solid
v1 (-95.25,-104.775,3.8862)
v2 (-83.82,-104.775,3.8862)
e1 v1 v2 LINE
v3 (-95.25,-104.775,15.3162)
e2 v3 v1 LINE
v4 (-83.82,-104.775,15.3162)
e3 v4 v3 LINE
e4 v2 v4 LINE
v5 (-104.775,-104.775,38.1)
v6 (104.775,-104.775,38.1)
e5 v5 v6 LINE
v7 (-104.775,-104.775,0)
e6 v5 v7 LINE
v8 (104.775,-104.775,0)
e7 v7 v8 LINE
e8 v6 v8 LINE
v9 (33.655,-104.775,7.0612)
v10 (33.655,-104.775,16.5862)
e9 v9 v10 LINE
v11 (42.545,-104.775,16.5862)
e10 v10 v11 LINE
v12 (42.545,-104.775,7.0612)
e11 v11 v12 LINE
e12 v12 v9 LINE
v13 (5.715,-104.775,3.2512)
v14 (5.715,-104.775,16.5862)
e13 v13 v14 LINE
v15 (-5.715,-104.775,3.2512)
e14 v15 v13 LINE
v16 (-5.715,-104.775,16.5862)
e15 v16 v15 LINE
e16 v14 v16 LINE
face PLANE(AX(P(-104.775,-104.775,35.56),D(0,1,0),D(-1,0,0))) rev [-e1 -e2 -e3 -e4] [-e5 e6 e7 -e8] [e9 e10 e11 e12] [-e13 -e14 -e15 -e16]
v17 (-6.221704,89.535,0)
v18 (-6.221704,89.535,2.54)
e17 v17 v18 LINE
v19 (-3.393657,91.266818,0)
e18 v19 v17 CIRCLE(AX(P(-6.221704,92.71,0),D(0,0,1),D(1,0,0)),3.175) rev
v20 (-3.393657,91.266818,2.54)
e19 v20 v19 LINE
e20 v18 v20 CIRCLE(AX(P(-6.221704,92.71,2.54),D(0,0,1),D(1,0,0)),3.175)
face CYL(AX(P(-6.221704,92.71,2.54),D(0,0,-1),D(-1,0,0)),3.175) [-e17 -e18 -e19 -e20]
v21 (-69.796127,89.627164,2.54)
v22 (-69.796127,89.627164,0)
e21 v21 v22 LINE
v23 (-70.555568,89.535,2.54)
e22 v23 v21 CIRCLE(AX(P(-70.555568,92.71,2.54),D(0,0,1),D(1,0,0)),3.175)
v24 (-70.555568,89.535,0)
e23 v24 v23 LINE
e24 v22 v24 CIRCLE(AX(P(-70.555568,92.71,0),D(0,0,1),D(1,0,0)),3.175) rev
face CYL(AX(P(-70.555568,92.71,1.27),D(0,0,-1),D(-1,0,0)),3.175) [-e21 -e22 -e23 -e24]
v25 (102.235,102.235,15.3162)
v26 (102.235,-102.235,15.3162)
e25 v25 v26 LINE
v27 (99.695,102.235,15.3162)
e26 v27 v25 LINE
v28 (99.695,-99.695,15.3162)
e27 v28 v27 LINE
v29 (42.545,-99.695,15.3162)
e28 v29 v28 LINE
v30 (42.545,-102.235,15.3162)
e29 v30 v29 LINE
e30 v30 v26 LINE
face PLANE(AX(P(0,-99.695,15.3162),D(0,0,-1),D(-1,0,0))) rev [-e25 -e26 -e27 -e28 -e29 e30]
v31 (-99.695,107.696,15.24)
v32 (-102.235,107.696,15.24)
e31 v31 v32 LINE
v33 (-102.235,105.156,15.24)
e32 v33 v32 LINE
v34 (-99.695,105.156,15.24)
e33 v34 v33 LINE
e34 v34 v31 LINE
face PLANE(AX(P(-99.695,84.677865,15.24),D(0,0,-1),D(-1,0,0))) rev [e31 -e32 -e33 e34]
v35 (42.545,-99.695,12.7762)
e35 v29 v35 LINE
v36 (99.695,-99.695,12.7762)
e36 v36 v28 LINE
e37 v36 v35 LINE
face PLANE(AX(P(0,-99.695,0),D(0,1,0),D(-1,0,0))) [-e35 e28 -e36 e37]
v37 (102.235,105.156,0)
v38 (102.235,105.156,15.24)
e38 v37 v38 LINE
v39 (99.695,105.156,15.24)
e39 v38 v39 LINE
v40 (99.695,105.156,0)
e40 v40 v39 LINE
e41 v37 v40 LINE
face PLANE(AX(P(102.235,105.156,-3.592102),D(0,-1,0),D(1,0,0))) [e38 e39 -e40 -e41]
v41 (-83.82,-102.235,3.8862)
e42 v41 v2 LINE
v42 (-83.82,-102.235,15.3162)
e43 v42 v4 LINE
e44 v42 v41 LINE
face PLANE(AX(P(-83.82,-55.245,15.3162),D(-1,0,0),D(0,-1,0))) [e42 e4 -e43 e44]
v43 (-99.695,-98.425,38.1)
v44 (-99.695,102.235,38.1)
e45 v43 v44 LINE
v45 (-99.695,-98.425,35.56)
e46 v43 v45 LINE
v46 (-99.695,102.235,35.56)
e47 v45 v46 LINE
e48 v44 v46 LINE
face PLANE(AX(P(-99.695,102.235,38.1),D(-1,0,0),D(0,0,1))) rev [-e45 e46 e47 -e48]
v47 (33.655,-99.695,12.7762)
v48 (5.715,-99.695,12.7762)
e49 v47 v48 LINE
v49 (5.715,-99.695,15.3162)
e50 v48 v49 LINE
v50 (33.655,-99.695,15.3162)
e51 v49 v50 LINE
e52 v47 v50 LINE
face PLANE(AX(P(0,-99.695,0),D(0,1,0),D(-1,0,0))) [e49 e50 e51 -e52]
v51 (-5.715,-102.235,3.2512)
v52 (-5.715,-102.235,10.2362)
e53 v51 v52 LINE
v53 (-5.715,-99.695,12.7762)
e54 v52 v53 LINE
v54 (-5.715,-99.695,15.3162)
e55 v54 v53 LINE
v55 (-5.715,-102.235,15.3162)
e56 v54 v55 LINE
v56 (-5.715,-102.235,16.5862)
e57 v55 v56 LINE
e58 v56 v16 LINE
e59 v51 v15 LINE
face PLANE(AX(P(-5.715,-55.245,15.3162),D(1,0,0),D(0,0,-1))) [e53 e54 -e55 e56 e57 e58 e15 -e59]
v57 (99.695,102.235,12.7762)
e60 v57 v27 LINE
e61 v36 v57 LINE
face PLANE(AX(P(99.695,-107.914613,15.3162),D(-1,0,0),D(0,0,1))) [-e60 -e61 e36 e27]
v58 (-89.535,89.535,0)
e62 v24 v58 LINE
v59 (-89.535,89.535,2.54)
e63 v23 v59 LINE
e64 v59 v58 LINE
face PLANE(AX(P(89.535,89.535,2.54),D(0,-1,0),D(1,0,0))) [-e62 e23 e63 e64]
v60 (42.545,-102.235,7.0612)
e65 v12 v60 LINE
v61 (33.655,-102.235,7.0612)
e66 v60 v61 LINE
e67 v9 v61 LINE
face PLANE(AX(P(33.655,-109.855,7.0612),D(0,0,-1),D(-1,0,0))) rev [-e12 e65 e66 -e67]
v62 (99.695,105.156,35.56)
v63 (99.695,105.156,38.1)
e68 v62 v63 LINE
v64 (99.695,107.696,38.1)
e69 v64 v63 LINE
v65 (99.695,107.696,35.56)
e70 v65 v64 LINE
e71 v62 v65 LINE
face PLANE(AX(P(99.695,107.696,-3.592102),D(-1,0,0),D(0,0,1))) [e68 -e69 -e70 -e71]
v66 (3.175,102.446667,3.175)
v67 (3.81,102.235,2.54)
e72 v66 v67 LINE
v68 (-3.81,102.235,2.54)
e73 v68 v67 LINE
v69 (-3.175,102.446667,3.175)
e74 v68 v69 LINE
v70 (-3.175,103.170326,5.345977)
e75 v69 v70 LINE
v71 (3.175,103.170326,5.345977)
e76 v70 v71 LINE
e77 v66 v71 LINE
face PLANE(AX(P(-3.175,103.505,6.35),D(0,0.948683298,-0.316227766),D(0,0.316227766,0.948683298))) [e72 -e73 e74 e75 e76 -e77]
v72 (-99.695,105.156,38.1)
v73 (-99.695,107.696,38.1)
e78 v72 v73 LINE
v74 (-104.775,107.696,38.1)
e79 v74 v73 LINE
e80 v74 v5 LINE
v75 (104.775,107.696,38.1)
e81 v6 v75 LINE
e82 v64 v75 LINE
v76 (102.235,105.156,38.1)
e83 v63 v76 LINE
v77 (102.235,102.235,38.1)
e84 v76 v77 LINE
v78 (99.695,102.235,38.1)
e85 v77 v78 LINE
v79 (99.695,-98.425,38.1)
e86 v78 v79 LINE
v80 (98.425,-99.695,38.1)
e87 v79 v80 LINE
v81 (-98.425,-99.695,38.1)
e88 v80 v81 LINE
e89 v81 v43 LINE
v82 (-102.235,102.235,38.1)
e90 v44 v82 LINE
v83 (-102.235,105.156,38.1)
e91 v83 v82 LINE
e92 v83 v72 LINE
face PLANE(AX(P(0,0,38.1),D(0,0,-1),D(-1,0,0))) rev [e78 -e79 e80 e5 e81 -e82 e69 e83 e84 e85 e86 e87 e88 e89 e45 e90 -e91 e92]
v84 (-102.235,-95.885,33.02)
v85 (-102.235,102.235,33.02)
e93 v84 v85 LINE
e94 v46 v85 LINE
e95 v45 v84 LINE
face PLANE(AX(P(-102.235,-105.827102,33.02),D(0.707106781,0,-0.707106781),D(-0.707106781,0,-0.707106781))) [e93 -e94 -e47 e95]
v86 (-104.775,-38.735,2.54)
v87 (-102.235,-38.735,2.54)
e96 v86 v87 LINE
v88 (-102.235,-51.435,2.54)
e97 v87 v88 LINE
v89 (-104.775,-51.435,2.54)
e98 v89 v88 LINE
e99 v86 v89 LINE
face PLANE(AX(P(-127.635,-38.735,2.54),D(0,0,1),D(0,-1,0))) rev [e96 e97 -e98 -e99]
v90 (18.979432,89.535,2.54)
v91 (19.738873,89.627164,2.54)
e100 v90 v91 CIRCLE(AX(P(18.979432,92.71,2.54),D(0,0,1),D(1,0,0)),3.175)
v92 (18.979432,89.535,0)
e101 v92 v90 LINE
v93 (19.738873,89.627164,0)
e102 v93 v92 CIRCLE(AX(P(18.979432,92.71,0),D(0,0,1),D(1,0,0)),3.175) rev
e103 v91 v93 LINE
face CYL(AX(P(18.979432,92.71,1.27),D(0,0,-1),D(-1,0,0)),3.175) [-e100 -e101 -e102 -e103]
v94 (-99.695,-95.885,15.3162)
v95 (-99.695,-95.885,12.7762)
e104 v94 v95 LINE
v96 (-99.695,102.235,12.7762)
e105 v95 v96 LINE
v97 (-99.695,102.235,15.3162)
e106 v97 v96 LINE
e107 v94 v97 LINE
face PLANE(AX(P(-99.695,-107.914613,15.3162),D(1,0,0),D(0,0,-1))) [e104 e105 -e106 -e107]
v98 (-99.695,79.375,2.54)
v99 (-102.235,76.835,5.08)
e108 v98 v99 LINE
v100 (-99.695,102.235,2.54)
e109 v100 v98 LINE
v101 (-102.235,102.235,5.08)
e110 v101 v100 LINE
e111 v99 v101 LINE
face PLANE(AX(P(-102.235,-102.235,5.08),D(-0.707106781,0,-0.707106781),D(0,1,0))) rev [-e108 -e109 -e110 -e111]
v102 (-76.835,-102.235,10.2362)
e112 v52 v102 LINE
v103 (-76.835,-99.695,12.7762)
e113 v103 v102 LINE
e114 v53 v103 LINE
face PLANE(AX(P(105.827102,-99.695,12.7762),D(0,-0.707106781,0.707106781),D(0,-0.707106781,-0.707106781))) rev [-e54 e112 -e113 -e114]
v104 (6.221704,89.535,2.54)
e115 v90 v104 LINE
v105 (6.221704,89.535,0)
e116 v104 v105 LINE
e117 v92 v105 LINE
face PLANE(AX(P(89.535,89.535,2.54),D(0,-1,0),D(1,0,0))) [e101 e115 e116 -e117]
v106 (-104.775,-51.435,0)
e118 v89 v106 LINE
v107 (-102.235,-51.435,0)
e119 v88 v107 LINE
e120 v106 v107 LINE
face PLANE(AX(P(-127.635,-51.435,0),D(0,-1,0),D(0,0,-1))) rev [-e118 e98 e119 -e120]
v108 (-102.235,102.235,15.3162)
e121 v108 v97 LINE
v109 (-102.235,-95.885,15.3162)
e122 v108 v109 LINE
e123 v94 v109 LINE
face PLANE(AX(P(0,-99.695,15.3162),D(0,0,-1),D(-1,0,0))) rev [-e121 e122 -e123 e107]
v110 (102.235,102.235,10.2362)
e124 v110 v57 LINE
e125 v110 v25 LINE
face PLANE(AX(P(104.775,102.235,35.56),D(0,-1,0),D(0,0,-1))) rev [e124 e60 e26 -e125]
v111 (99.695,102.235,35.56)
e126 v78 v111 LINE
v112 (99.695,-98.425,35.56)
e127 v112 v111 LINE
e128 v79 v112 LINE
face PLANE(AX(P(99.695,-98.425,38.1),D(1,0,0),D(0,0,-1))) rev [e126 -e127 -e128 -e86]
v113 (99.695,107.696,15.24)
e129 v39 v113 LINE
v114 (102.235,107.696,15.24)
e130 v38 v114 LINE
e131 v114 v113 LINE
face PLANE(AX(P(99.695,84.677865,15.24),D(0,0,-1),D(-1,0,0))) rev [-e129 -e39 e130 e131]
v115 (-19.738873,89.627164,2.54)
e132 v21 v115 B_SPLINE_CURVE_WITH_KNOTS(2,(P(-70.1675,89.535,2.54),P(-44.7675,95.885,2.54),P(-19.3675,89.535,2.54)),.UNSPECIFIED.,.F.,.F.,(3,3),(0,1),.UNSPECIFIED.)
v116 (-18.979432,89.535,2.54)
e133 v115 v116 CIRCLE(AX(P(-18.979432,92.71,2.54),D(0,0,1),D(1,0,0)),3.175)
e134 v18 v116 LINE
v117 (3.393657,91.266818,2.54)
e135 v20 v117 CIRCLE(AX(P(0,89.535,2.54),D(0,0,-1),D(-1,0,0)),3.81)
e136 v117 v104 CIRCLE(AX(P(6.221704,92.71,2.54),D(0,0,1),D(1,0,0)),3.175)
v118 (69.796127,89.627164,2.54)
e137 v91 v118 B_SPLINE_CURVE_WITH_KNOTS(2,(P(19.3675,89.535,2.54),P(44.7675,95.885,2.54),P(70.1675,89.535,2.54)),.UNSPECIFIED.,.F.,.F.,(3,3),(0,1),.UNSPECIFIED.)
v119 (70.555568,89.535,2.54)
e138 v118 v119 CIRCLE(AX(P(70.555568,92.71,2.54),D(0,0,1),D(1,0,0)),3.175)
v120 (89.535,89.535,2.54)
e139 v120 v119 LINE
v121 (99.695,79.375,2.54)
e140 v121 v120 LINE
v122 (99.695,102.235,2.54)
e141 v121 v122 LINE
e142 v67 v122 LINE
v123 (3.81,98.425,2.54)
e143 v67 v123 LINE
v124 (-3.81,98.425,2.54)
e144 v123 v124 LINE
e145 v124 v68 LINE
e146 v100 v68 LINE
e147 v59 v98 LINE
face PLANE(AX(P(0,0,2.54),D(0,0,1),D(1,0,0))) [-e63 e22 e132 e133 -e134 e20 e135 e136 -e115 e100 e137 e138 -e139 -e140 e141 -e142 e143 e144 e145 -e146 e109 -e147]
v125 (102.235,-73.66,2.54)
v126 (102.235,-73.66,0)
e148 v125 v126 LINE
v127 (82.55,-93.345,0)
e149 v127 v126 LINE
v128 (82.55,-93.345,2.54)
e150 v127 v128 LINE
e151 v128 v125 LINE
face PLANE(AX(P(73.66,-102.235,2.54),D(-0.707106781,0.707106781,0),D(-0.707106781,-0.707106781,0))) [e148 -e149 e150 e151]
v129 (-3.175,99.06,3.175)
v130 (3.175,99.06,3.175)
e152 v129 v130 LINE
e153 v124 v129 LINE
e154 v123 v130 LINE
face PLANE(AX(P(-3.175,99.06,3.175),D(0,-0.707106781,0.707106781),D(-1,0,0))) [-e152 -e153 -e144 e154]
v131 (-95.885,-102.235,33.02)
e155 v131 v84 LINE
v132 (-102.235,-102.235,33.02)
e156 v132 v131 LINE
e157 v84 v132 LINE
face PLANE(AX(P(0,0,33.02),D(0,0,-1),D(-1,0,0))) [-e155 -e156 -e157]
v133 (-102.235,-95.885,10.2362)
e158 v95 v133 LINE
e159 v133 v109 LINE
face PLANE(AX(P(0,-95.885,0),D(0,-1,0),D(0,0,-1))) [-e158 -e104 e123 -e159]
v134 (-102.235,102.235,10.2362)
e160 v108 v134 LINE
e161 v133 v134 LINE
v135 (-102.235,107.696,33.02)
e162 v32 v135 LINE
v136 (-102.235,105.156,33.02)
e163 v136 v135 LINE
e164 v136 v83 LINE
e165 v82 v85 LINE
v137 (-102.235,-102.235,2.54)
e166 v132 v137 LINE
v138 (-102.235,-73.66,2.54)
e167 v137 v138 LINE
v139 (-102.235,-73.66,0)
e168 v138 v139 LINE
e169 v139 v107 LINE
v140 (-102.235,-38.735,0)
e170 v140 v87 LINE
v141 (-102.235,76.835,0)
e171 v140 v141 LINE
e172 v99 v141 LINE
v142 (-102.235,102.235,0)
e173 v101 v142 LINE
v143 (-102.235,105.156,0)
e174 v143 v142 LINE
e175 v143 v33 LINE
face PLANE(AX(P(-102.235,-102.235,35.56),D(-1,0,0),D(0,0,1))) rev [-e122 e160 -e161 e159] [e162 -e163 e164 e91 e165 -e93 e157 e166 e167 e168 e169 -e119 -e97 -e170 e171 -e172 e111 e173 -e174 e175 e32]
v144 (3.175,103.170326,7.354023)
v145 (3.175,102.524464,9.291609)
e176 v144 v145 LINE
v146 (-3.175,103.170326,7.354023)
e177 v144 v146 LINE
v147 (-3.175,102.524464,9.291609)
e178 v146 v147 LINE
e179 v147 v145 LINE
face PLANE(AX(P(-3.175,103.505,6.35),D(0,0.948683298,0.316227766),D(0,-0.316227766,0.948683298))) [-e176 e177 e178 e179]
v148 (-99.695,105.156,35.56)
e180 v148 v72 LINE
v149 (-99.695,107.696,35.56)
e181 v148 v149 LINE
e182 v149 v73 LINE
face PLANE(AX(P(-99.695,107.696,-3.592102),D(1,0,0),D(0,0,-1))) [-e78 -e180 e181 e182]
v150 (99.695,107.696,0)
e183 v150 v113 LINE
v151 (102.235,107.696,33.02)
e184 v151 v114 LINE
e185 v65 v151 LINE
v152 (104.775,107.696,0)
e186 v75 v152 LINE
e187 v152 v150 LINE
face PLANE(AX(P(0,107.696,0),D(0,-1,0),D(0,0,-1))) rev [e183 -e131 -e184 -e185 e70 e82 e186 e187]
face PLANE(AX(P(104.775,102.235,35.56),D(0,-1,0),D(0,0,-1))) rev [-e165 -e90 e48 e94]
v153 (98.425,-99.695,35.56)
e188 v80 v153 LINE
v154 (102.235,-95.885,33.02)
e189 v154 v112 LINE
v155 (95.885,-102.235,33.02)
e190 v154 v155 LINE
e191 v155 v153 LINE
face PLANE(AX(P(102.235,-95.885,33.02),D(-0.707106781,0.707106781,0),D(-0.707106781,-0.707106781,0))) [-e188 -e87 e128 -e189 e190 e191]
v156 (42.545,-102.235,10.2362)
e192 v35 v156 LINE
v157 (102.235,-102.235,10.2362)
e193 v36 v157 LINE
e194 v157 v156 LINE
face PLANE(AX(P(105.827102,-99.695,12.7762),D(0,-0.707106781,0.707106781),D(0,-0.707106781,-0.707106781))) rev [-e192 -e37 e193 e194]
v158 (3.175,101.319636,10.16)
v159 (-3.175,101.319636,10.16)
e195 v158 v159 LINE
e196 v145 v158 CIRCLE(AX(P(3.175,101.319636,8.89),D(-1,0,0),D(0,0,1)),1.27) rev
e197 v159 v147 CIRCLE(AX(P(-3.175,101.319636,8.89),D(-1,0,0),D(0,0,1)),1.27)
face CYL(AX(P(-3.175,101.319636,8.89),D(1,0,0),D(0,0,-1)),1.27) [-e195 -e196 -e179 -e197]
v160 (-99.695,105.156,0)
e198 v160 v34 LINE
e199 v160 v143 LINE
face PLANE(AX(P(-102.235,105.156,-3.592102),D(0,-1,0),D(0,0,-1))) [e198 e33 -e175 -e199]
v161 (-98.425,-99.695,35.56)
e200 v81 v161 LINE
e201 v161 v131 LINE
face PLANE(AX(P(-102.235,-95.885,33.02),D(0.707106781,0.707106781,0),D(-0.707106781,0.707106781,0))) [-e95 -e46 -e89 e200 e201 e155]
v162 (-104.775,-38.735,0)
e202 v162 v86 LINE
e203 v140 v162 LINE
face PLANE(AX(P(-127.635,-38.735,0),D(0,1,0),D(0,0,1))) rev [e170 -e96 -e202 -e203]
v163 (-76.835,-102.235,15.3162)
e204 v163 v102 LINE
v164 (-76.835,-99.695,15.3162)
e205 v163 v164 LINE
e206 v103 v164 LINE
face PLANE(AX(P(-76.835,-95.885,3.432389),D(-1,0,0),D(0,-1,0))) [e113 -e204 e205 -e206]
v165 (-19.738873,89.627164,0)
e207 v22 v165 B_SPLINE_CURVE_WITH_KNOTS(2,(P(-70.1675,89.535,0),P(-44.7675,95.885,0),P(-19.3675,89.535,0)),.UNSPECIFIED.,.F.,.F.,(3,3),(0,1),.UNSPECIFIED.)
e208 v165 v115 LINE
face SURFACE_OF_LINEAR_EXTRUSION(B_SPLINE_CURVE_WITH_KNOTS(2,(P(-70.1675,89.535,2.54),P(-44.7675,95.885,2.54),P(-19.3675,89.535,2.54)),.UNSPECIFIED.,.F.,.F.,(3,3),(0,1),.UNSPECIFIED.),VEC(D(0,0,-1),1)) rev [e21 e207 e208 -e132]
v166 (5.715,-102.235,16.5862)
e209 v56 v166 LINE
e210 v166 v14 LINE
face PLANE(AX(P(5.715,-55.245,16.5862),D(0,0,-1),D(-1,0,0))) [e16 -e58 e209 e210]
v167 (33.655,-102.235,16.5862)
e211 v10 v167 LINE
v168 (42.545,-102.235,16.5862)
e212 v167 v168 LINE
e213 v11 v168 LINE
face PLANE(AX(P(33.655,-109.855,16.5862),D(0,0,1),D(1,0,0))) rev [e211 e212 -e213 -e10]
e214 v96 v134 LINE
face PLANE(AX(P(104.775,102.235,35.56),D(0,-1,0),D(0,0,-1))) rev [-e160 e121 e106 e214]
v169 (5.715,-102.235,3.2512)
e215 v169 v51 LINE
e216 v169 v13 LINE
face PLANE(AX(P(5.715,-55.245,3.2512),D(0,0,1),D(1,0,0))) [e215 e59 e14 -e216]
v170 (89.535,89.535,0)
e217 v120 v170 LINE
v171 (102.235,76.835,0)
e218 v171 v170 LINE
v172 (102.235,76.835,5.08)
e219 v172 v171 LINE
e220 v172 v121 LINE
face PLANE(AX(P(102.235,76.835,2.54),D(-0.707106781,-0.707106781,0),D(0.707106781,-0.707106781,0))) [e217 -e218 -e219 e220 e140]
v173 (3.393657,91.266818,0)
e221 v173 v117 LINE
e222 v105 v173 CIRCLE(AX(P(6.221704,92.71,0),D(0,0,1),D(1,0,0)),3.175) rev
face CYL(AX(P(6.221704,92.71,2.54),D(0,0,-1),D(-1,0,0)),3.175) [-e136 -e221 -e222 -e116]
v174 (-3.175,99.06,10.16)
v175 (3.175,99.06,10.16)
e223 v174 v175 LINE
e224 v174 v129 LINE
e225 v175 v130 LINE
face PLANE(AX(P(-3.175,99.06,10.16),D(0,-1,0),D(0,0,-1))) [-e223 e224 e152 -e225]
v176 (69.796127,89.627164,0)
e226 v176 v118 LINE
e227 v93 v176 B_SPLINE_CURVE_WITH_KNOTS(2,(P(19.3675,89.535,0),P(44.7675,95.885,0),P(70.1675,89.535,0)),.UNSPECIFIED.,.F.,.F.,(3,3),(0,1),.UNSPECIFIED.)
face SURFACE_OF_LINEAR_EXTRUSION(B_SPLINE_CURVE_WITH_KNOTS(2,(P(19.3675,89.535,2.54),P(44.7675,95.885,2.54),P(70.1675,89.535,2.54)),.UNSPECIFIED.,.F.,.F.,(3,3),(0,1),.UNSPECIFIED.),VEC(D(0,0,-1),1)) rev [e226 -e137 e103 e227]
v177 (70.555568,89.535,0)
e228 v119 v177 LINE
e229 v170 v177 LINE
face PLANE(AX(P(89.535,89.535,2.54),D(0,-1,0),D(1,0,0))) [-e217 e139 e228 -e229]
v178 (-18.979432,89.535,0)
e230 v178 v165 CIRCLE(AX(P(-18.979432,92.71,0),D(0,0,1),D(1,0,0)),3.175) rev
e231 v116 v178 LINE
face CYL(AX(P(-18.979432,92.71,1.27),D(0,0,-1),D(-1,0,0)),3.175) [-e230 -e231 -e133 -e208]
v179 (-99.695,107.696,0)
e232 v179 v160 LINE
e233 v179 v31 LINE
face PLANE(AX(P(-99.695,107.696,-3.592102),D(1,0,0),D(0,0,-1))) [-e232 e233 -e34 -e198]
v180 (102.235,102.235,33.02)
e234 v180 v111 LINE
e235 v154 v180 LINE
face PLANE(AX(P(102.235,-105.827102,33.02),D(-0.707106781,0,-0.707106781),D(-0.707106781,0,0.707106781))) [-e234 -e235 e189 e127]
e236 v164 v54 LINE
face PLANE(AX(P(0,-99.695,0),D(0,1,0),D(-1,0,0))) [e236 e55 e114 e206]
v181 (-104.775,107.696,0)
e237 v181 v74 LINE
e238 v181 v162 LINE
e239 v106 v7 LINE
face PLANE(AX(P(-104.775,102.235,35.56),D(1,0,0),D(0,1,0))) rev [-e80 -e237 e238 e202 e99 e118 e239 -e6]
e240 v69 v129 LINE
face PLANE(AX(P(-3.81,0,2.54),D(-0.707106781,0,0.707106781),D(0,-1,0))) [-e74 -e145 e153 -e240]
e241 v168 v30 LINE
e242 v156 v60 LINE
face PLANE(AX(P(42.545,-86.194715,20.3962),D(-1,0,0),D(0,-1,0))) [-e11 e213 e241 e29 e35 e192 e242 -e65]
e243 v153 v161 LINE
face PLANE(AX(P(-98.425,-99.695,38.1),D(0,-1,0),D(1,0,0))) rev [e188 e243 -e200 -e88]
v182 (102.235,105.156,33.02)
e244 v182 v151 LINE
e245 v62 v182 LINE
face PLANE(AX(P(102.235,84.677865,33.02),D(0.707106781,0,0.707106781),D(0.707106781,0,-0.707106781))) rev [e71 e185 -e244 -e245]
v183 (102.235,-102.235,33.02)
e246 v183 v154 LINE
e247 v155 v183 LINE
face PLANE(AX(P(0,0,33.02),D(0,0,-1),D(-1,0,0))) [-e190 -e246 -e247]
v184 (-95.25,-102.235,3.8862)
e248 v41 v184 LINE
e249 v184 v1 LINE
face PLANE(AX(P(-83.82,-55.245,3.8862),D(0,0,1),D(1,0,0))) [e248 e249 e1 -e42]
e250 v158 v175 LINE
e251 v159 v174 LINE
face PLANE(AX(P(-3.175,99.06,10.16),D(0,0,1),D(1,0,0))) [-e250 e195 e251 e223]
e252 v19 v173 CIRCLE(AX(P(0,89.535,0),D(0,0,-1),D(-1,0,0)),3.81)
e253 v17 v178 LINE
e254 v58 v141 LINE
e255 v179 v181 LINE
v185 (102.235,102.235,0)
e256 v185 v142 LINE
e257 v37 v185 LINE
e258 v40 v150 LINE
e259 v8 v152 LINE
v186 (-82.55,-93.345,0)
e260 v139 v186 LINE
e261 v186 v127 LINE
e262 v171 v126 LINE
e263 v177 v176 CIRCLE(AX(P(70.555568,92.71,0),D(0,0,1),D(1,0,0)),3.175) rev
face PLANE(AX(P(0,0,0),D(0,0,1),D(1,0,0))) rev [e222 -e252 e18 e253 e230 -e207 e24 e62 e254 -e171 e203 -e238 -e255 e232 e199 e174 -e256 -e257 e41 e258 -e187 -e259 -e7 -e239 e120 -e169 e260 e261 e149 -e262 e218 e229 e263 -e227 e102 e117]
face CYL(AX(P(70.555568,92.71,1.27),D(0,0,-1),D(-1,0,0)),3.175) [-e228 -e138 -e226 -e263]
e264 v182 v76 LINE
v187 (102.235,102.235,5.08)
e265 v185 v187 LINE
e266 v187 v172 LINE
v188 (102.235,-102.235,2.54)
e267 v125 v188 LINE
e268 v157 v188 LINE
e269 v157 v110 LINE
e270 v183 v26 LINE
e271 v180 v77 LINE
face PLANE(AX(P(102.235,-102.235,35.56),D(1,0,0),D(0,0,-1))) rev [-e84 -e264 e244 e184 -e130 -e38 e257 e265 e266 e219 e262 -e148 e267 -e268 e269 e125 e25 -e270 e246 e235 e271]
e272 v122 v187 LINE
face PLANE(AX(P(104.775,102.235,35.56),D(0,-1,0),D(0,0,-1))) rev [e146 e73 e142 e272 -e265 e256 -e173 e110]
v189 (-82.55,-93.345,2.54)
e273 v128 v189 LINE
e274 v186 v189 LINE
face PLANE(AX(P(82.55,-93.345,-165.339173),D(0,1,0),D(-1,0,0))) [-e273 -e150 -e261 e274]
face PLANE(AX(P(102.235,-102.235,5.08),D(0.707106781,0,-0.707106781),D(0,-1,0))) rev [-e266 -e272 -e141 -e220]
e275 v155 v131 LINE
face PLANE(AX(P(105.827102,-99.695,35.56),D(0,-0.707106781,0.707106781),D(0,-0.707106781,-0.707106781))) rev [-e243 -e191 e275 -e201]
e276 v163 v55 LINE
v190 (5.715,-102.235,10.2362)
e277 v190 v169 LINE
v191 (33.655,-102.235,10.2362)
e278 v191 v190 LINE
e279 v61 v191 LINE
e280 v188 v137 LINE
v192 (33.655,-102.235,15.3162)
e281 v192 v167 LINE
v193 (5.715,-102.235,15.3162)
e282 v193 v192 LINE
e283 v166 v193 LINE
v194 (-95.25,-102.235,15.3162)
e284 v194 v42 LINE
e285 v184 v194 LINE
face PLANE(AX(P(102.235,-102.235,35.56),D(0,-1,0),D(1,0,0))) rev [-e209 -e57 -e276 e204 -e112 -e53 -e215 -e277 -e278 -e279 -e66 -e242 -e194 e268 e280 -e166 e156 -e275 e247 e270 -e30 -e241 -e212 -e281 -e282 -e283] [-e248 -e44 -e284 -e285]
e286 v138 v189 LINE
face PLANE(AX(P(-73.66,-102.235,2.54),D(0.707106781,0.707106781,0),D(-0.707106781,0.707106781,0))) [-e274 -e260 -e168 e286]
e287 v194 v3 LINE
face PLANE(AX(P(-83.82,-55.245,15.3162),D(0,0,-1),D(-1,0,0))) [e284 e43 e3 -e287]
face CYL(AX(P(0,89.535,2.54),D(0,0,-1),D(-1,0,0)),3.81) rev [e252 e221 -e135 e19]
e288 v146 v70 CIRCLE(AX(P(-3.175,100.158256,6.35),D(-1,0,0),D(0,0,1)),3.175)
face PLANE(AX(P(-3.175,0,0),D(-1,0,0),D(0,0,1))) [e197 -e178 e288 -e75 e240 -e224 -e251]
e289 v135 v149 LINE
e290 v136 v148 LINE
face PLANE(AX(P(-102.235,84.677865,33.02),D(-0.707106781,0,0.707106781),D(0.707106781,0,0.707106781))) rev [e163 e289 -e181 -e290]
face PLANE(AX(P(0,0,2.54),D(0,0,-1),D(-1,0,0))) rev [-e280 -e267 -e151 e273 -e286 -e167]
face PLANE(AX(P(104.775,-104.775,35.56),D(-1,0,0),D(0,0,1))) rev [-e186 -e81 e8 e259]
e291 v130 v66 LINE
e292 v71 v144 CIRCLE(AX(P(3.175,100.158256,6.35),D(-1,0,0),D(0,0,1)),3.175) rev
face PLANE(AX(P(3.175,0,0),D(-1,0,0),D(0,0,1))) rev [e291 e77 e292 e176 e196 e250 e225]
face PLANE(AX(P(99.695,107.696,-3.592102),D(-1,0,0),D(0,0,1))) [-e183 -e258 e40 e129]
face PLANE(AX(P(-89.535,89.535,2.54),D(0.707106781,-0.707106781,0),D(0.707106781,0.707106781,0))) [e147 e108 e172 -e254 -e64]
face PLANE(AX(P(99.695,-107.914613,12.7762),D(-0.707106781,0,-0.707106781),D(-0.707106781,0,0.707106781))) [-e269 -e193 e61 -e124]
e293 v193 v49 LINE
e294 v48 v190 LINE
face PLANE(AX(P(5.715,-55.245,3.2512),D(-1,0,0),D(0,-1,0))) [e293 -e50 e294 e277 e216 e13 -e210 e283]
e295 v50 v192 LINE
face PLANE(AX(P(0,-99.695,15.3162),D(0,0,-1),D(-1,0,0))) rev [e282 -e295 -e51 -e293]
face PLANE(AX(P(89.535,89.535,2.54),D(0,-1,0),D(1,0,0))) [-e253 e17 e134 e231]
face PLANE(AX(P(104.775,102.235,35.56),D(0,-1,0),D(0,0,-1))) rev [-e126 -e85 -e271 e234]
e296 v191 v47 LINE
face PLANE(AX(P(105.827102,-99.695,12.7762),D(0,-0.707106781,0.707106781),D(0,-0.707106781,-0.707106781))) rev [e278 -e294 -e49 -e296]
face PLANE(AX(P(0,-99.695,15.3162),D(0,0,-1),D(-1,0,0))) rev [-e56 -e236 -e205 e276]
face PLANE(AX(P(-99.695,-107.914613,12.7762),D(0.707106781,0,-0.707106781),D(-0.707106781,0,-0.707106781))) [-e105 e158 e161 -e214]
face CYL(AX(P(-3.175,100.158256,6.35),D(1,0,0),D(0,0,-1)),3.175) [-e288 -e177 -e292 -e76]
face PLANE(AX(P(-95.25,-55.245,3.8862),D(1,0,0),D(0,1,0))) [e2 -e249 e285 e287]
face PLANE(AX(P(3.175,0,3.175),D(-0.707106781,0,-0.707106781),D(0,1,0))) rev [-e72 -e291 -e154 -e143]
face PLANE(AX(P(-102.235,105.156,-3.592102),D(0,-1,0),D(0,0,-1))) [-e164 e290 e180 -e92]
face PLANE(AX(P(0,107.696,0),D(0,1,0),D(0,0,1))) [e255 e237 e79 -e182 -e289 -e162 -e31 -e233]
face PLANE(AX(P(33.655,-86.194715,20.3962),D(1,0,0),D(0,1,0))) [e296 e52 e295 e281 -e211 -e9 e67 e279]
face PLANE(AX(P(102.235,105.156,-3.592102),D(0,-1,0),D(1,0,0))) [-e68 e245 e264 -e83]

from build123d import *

# Parameters (mm, degrees)
BOSS_EXTRUDE1_DEPTH       = 35.56
BOSS_EXTRUDE2_DEPTH       = 2.54
BOSS_EXTRUDE3_REACH       = 236.724
BOSS_EXTRUDE4_REACH       = 236.724
BOSS_EXTRUDE5_DEPTH       = 2.54
BOSS_EXTRUDE6_DEPTH       = 204.47
BOSS_EXTRUDE7_REACH       = 236.724
BOSS_EXTRUDE8_DEPTH       = 2.54
BOSS_EXTRUDE9_DEPTH       = 2.54
SKETCH11_R                = 3.81
CUT_EXTRUDE1_DEPTH        = 2.54
FILLET1_R                 = 3.175
CHAMFER1_SIZE             = 2.54
SKETCH12_W                = 2.54
SKETCH12_H                = 38.1
BOSS_EXTRUDE10_DEPTH      = 5.461
SKETCH13_W                = 2.54
SKETCH13_H                = 2.54
BOSS_EXTRUDE11_DEPTH      = 38.1
BOSS_EXTRUDE12_DEPTH      = 3.175
BOSS_EXTRUDE12_DEPTH_BACK = 3.175
FILLET2_R                 = 3.175
CHAMFER2_SIZE             = 0.635
FILLET3_R                 = 1.27
CUT_EXTRUDE2_DEPTH        = 46.99
CUT_EXTRUDE2_DEPTH_BACK   = 3.175
SKETCH15_W                = 11.43
SKETCH15_H                = 11.43
SKETCH16_W                = 11.43
SKETCH16_H                = 37.106454998
SKETCH16_W_2              = 25.4
SKETCH16_H_2              = 12.337621438
CUT_EXTRUDE3_DEPTH        = 6.35
CUT_EXTRUDE4_DEPTH        = 2.54
SKETCH18_W                = 2.54
SKETCH18_H                = 12.7
CUT_EXTRUDE5_DEPTH        = 25.4
BOSS_EXTRUDE13_DEPTH      = 2.54
SKETCH20_W                = 8.89
SKETCH20_H                = 10.16
CUT_EXTRUDE6_DEPTH        = 2.54
SKETCH21_W                = 8.89
SKETCH21_H                = 9.525
CUT_EXTRUDE7_DEPTH        = 7.62


with BuildPart() as part:
    # Sketch1 → Boss-Extrude1 (new body)
    with BuildSketch(Plane.XY):
        Polygon((-102.235, 102.235), (-104.775, 102.235), (-104.775, -104.775), (104.775, -104.775), (104.775, 102.235), (102.235, 102.235), (102.235, -102.235), (-102.235, -102.235), align=None)
    extrude(amount=BOSS_EXTRUDE1_DEPTH)

    # Sketch2 → Boss-Extrude2 (add)
    with BuildSketch(Plane.XY.offset(35.56)):
        Polygon((-102.235, -102.235), (-102.235, -95.885), (-95.885, -102.235), align=None)
        Polygon((102.235, -102.235), (102.235, -95.885), (95.885, -102.235), align=None)
    extrude(amount=-BOSS_EXTRUDE2_DEPTH)

    # Boss-Extrude3: up to this face of the body (flat: up to its plane)
    boss_extrude3_end = Plane(part.part.faces().sort_by_distance((0, -102.235, 17.706426025))[0])
    # Sketch4 → Boss-Extrude3 (add, up to the picked face)
    with BuildSketch(Plane(origin=(0, 102.235, 0), x_dir=(1, 0, 0), z_dir=(0, 1, 0)), mode=Mode.PRIVATE) as boss_extrude3_sk1:
        Polygon((-102.235, -33.02), (-99.695, -35.56), (-102.235, -35.56), align=None)
    boss_extrude3_tool1 = split(extrude(boss_extrude3_sk1.sketch, amount=-BOSS_EXTRUDE3_REACH, mode=Mode.PRIVATE), bisect_by=boss_extrude3_end, keep=Keep.BOTH, mode=Mode.PRIVATE)
    # Sketch4 → Boss-Extrude3 (add, up to the picked face)
    with BuildSketch(Plane(origin=(0, 102.235, 0), x_dir=(1, 0, 0), z_dir=(0, 1, 0)), mode=Mode.PRIVATE) as boss_extrude3_sk2:
        Polygon((102.235, -33.02), (99.695, -35.56), (102.235, -35.56), align=None)
    boss_extrude3_tool2 = split(extrude(boss_extrude3_sk2.sketch, amount=-BOSS_EXTRUDE3_REACH, mode=Mode.PRIVATE), bisect_by=boss_extrude3_end, keep=Keep.BOTH, mode=Mode.PRIVATE)
    add(boss_extrude3_tool1.solids().sort_by(Axis((-101.388333, 102.235, 34.713333), (0, -1, 0)))[0])
    add(boss_extrude3_tool2.solids().sort_by(Axis((101.388333, 102.235, 34.713333), (0, -1, 0)))[0])

    # Boss-Extrude4: up to this plane
    boss_extrude4_end = Plane(origin=(102.235, -95.885, 33.02), z_dir=(-0.7071067811865476, 0.7071067811865476, 0))
    # Sketch5 → Boss-Extrude4 (add, up to the surface)
    with BuildSketch(Plane(origin=(-102.235, 0, 0), x_dir=(0, 0, -1), z_dir=(1, 0, 0)), mode=Mode.PRIVATE) as boss_extrude4_sk1:
        Polygon((-33.02, -102.235), (-35.56, -102.235), (-35.56, -99.695), align=None)
    boss_extrude4_tool1 = split(extrude(boss_extrude4_sk1.sketch, amount=BOSS_EXTRUDE4_REACH, mode=Mode.PRIVATE), bisect_by=boss_extrude4_end, keep=Keep.BOTH, mode=Mode.PRIVATE)
    add(boss_extrude4_tool1.solids().sort_by_distance((-102.235, -101.388333, 34.713333))[0])

    # Sketch6 → Boss-Extrude5 (add)
    with BuildSketch(Plane(origin=(0, -102.235, 0), x_dir=(1, 0, 0), z_dir=(0, 1, 0))):
        Polygon((0, -15.3162), (-102.235, -15.3162), (-102.235, -12.7762), (102.235, -12.7762), (102.235, -15.3162), align=None)
    extrude(amount=BOSS_EXTRUDE5_DEPTH)

    # Sketch7 → Boss-Extrude6 (add)
    with BuildSketch(Plane(origin=(-102.235, 0, 0), x_dir=(0, 0, -1), z_dir=(1, 0, 0))):
        Polygon((-12.7762, -99.695), (-10.2362, -102.235), (-12.7762, -102.235), align=None)
    extrude(amount=BOSS_EXTRUDE6_DEPTH)

    # Boss-Extrude7: up to this face of the body (flat: up to its plane)
    boss_extrude7_end = Plane(part.part.faces().sort_by_distance((0, -102.235, 24.1681))[0])
    # Sketch8 → Boss-Extrude7 (add, up to the picked face)
    with BuildSketch(Plane(origin=(0, 102.235, 0), x_dir=(1, 0, 0), z_dir=(0, 1, 0)), mode=Mode.PRIVATE) as boss_extrude7_sk1:
        Polygon((-102.235, -15.3162), (-99.695, -15.3162), (-99.695, -12.7762), (-102.235, -10.2362), align=None)
    boss_extrude7_tool1 = split(extrude(boss_extrude7_sk1.sketch, amount=-BOSS_EXTRUDE7_REACH, mode=Mode.PRIVATE), bisect_by=boss_extrude7_end, keep=Keep.BOTH, mode=Mode.PRIVATE)
    # Sketch8 → Boss-Extrude7 (add, up to the picked face)
    with BuildSketch(Plane(origin=(0, 102.235, 0), x_dir=(1, 0, 0), z_dir=(0, 1, 0)), mode=Mode.PRIVATE) as boss_extrude7_sk2:
        Polygon((99.695, -15.3162), (99.695, -12.7762), (102.235, -10.2362), (102.235, -15.3162), align=None)
    boss_extrude7_tool2 = split(extrude(boss_extrude7_sk2.sketch, amount=-BOSS_EXTRUDE7_REACH, mode=Mode.PRIVATE), bisect_by=boss_extrude7_end, keep=Keep.BOTH, mode=Mode.PRIVATE)
    add(boss_extrude7_tool1.solids().sort_by(Axis((-101.106111, 102.235, 13.340644), (0, -1, 0)))[0])
    add(boss_extrude7_tool2.solids().sort_by(Axis((101.106111, 102.235, 13.340644), (0, -1, 0)))[0])

    # Sketch9 → Boss-Extrude8 (add)
    with BuildSketch(Plane.XY.offset(35.56)):
        Polygon((-104.775, 102.235), (-99.695, 102.235), (-99.695, -98.425), (-98.425, -99.695), (98.425, -99.695), (99.695, -98.425), (99.695, 102.235), (104.775, 102.235), (104.775, -104.775), (-104.775, -104.775), align=None)
    extrude(amount=BOSS_EXTRUDE8_DEPTH)

    # Sketch10 → Boss-Extrude9 (add)
    with BuildSketch(Plane(origin=(0, 0, 0), x_dir=(-1, 0, 0), z_dir=(0, 0, -1))):
        Polygon((-102.235, 102.235), (102.235, 102.235), (102.235, 89.535), (102.235, 76.835), (89.535, 89.535), (-89.535, 89.535), (-102.235, 76.835), (-102.235, 89.535), align=None)
        Polygon((-102.235, -102.235), (-73.66, -102.235), (-102.235, -73.66), align=None)
        Polygon((102.235, -102.235), (73.66, -102.235), (102.235, -73.66), align=None)
    extrude(amount=-BOSS_EXTRUDE9_DEPTH)

    # Sketch11 → Cut-Extrude1 (cut)
    with BuildSketch(Plane(origin=(0, 0, 0), x_dir=(-1, 0, 0), z_dir=(0, 0, -1))):
        with Locations((0, 89.535)):
            Circle(SKETCH11_R)
        with BuildLine():
            Line((-44.7675, 89.535), (-19.3675, 89.535))
            add(Edge.make_bspline(
                [(-19.3675, 89.535), (-44.7675, 95.885), (-70.1675, 89.535)],
                knots=[0, 0, 0, 1, 1, 1], degree=2))
            Line((-70.1675, 89.535), (-44.7675, 89.535))
        make_face()
        with BuildLine():
            Line((44.7675, 89.535), (19.3675, 89.535))
            add(Edge.make_bspline(
                [(19.3675, 89.535), (44.7675, 95.885), (70.1675, 89.535)],
                knots=[0, 0, 0, 1, 1, 1], degree=2))
            Line((70.1675, 89.535), (44.7675, 89.535))
        make_face()
    extrude(amount=-CUT_EXTRUDE1_DEPTH, mode=Mode.SUBTRACT)

    # Fillet1
    fillet1_edges = [part.edges().sort_by_distance(p)[0] for p in [
        (-19.3675, 89.535, 1.27),
        (-70.1675, 89.535, 1.27),
        (70.1675, 89.535, 1.27),
        (19.3675, 89.535, 1.27),
        (-3.81, 89.535, 1.27),
        (3.81, 89.535, 1.27),
    ]]
    fillet(fillet1_edges, radius=FILLET1_R)

    # Chamfer1
    chamfer1_edges = [part.edges().sort_by_distance(p)[0] for p in [
        (-102.235, 89.535, 2.54),
        (102.235, 89.535, 2.54),
    ]]
    chamfer(chamfer1_edges, length=CHAMFER1_SIZE)

    # Sketch12 → Boss-Extrude10 (add)
    with BuildSketch(Plane(origin=(0, 102.235, 0), x_dir=(1, 0, 0), z_dir=(0, 1, 0))):
        with Locations((-103.505, -19.05)):
            Rectangle(SKETCH12_W, SKETCH12_H)
        with Locations((103.505, -19.05)):
            Rectangle(SKETCH12_W, SKETCH12_H)
    extrude(amount=BOSS_EXTRUDE10_DEPTH)

    # Sketch13 → Boss-Extrude11 (add)
    with BuildSketch(Plane.XY.offset(38.1)):
        with Locations((-100.965, 106.426)):
            Rectangle(SKETCH13_W, SKETCH13_H)
        with Locations((100.965, 106.426)):
            Rectangle(SKETCH13_W, SKETCH13_H)
    extrude(amount=-BOSS_EXTRUDE11_DEPTH)

    # Sketch14 → Boss-Extrude12 (add, two sides: drawn at the far end of the back side and taken through both)
    with BuildSketch(Plane(origin=(0, 0, 0), x_dir=(0, 0, -1), z_dir=(1, 0, 0)).offset(-BOSS_EXTRUDE12_DEPTH_BACK)):
        Polygon((-10.16, 99.06), (-2.54, 99.06), (-2.54, 102.235), (-6.35, 103.505), (-10.16, 102.235), align=None)
    extrude(amount=BOSS_EXTRUDE12_DEPTH + BOSS_EXTRUDE12_DEPTH_BACK)

    # Fillet2
    fillet2_edges = [part.edges().sort_by_distance(p)[0] for p in [
        (0, 103.505, 6.35),
    ]]
    fillet(fillet2_edges, radius=FILLET2_R)

    # Chamfer2
    # the kernel refuses this chamfer: 0.635 mm, written as the material it adds along each edge
    with BuildSketch(Plane(origin=(-3.175, 99.06, 2.54), x_dir=(0.02749587661058659, 0, 0.9996219169112968), z_dir=(0, 1, 0))) as chamfer2_piece_1_section:
        Polygon((CHAMFER2_SIZE * 0.999621916911, -CHAMFER2_SIZE * 0.0274958766106), (-CHAMFER2_SIZE * 0.0274958766106, -CHAMFER2_SIZE * 0.999621916911), (0, 0), align=None)
    chamfer2_piece_1 = extrude(amount=3.175, mode=Mode.PRIVATE)
    chamfer2_piece_1 = split(chamfer2_piece_1, bisect_by=Plane(origin=(-3.38440866, 102.139071745, 2.252215234), z_dir=(0, -0.9486832980505152, 0.3162277660168339)), keep=Keep.TOP, mode=Mode.PRIVATE)
    add(chamfer2_piece_1)
    with BuildSketch(Plane(origin=(-3.175, 99.06, 2.54), x_dir=(0.02749587661058659, 0, 0.9996219169112968), z_dir=(0, 1, 0))) as chamfer2_piece_2_section:
        Polygon((CHAMFER2_SIZE * 0.999621916911, -CHAMFER2_SIZE * 0.0274958766106), (-CHAMFER2_SIZE * 0.0274958766106, -CHAMFER2_SIZE * 0.999621916911), (0, 0), align=None)
    chamfer2_piece_2 = extrude(amount=4.808018697, mode=Mode.PRIVATE)
    chamfer2_piece_2 = split(chamfer2_piece_2, bisect_by=Plane(origin=(-3.319647303, 102.339821678, 2.854465035), z_dir=(0, -0.9486832980505152, 0.3162277660168339)), keep=Keep.TOP, mode=Mode.PRIVATE)
    chamfer2_piece_2 = split(chamfer2_piece_2, bisect_by=Plane(origin=(-3.319647303, 102.235, 2.871015826), z_dir=(0, 1, 0)), keep=Keep.TOP, mode=Mode.PRIVATE)
    add(chamfer2_piece_2)
    with BuildSketch(Plane(origin=(-3.175, 99.06, 2.54), x_dir=(0, -0.9996219169112966, -0.027495876610586965), z_dir=(1, 0, 0))) as chamfer2_piece_3:
        Polygon((CHAMFER2_SIZE * 0.999621916911, -CHAMFER2_SIZE * 0.0274958766106), (-CHAMFER2_SIZE * 0.0274958766106, -CHAMFER2_SIZE * 0.999621916911), (0, 0), align=None)
    extrude(amount=6.35)
    with BuildSketch(Plane(origin=(3.175, 99.06, 2.54), x_dir=(0.9996219169112968, 0, -0.027495876610587288), z_dir=(0, 1, 0))) as chamfer2_piece_4_section:
        Polygon((CHAMFER2_SIZE * 0.999621916911, -CHAMFER2_SIZE * 0.0274958766106), (-CHAMFER2_SIZE * 0.0274958766106, -CHAMFER2_SIZE * 0.999621916911), (0, 0), align=None)
    chamfer2_piece_4 = extrude(amount=3.175, mode=Mode.PRIVATE)
    chamfer2_piece_4 = split(chamfer2_piece_4, bisect_by=Plane(origin=(3.38440866, 102.139071745, 2.252215234), z_dir=(0, -0.9486832980505152, 0.3162277660168339)), keep=Keep.TOP, mode=Mode.PRIVATE)
    add(chamfer2_piece_4)
    with BuildSketch(Plane(origin=(3.175, 99.06, 2.54), x_dir=(0.9996219169112968, 0, -0.027495876610587288), z_dir=(0, 1, 0))) as chamfer2_piece_5_section:
        Polygon((CHAMFER2_SIZE * 0.999621916911, -CHAMFER2_SIZE * 0.0274958766106), (-CHAMFER2_SIZE * 0.0274958766106, -CHAMFER2_SIZE * 0.999621916911), (0, 0), align=None)
    chamfer2_piece_5 = extrude(amount=4.808018697, mode=Mode.PRIVATE)
    chamfer2_piece_5 = split(chamfer2_piece_5, bisect_by=Plane(origin=(3.319647303, 102.339821678, 2.854465035), z_dir=(0, -0.9486832980505152, 0.3162277660168339)), keep=Keep.TOP, mode=Mode.PRIVATE)
    chamfer2_piece_5 = split(chamfer2_piece_5, bisect_by=Plane(origin=(3.319647303, 102.235, 2.871015826), z_dir=(0, 1, 0)), keep=Keep.TOP, mode=Mode.PRIVATE)
    add(chamfer2_piece_5)
    with BuildSketch(Plane(origin=(-3.175, 97.426981303, 2.54), x_dir=(0.027495876610586608, 0, 0.9996219169112968), z_dir=(0, 1, 0))) as chamfer2_piece_6a_section:
        Polygon((CHAMFER2_SIZE * 0.999621916911, -CHAMFER2_SIZE * 0.0274958766106), (-CHAMFER2_SIZE * 0.0274958766106, -CHAMFER2_SIZE * 0.999621916911), (0, 0), align=None)
    chamfer2_piece_6a = extrude(amount=4.808018697, mode=Mode.PRIVATE)
    chamfer2_piece_6a = split(chamfer2_piece_6a, bisect_by=Plane(origin=(-3.384418953, 99.06, 2.749418953), z_dir=(0, -1, 0)), keep=Keep.TOP, mode=Mode.PRIVATE)
    with BuildSketch(Plane(origin=(-4.808018697, 99.06, 2.54), x_dir=(0, -0.9996219169112966, -0.027495876610585605), z_dir=(1, 0, 0))) as chamfer2_piece_6b_section:
        Polygon((CHAMFER2_SIZE * 0.999621916911, -CHAMFER2_SIZE * 0.0274958766106), (-CHAMFER2_SIZE * 0.0274958766106, -CHAMFER2_SIZE * 0.999621916911), (0, 0), align=None)
    chamfer2_piece_6b = extrude(amount=7.983018697, mode=Mode.PRIVATE)
    chamfer2_piece_6b = split(chamfer2_piece_6b, bisect_by=Plane(origin=(-3.175, 98.850581047, 2.749418953), z_dir=(-1, 0, 0)), keep=Keep.TOP, mode=Mode.PRIVATE)
    chamfer2_piece_6 = chamfer2_piece_6a & chamfer2_piece_6b
    add(chamfer2_piece_6)
    with BuildSketch(Plane(origin=(-3.175, 99.06, 2.54), x_dir=(0, -0.9996219169112966, -0.027495876610586965), z_dir=(1, 0, 0))) as chamfer2_piece_7a_section:
        Polygon((CHAMFER2_SIZE * 0.999621916911, -CHAMFER2_SIZE * 0.0274958766106), (-CHAMFER2_SIZE * 0.0274958766106, -CHAMFER2_SIZE * 0.999621916911), (0, 0), align=None)
    chamfer2_piece_7a = extrude(amount=7.983018697, mode=Mode.PRIVATE)
    chamfer2_piece_7a = split(chamfer2_piece_7a, bisect_by=Plane(origin=(3.175, 98.850581047, 2.749418953), z_dir=(1, 0, 0)), keep=Keep.TOP, mode=Mode.PRIVATE)
    with BuildSketch(Plane(origin=(3.175, 97.426981303, 2.54), x_dir=(0.9996219169112968, 0, -0.027495876610586608), z_dir=(0, 1, 0))) as chamfer2_piece_7b_section:
        Polygon((CHAMFER2_SIZE * 0.999621916911, -CHAMFER2_SIZE * 0.0274958766106), (-CHAMFER2_SIZE * 0.0274958766106, -CHAMFER2_SIZE * 0.999621916911), (0, 0), align=None)
    chamfer2_piece_7b = extrude(amount=4.808018697, mode=Mode.PRIVATE)
    chamfer2_piece_7b = split(chamfer2_piece_7b, bisect_by=Plane(origin=(3.384418953, 99.06, 2.749418953), z_dir=(0, -1, 0)), keep=Keep.TOP, mode=Mode.PRIVATE)
    chamfer2_piece_7 = chamfer2_piece_7a & chamfer2_piece_7b
    add(chamfer2_piece_7)

    # Fillet3
    fillet3_edges = [part.edges().sort_by_distance(p)[0] for p in [
        (0, 102.235, 10.16),
    ]]
    fillet(fillet3_edges, radius=FILLET3_R)

    # Sketch15 → Cut-Extrude2 (cut, two sides: drawn at the far end of the back side and taken through both)
    with BuildSketch(Plane(origin=(0, -102.235, 0), x_dir=(1, 0, 0), z_dir=(0, 1, 0)).offset(-CUT_EXTRUDE2_DEPTH_BACK)):
        with Locations((-89.535, -9.6012)):
            Rectangle(SKETCH15_W, SKETCH15_H)
        Polygon((-5.715, -10.2362), (-5.715, -15.3162), (-5.715, -16.5862), (5.715, -16.5862), (5.715, -15.3162), (5.715, -10.2362), (5.715, -3.2512), (-5.715, -3.2512), align=None)
    extrude(amount=CUT_EXTRUDE2_DEPTH + CUT_EXTRUDE2_DEPTH_BACK, mode=Mode.SUBTRACT)

    # Sketch16 → Cut-Extrude3 (cut)
    with BuildSketch(Plane(origin=(0, -102.235, 0), x_dir=(1, 0, 0), z_dir=(0, 1, 0))):
        with Locations((0, -8.636)):
            Rectangle(SKETCH16_W, SKETCH16_H)
        with Locations((-89.535, -9.6012)):
            Rectangle(SKETCH16_W_2, SKETCH16_H_2)
    extrude(amount=CUT_EXTRUDE3_DEPTH, mode=Mode.SUBTRACT)

    # Sketch17 → Cut-Extrude4 (cut)
    with BuildSketch(Plane(origin=(0, 107.696, 0), x_dir=(1, 0, 0), z_dir=(0, 1, 0))):
        Polygon((-102.235, -33.02), (-99.695, -35.56), (-99.695, -15.24), (-102.235, -15.24), align=None)
        Polygon((99.695, -15.24), (102.235, -15.24), (102.235, -33.02), (99.695, -35.56), align=None)
    extrude(amount=-CUT_EXTRUDE4_DEPTH, mode=Mode.SUBTRACT)

    # Sketch18 → Cut-Extrude5 (cut)
    with BuildSketch(Plane(origin=(-102.235, 0, 0), x_dir=(0, 0, -1), z_dir=(1, 0, 0))):
        with Locations((-1.27, -45.085)):
            Rectangle(SKETCH18_W, SKETCH18_H)
    extrude(amount=-CUT_EXTRUDE5_DEPTH, mode=Mode.SUBTRACT)

    # Sketch19 → Boss-Extrude13 (add)
    with BuildSketch(Plane.XY.offset(2.54)):
        Polygon((82.55, -93.345), (-82.55, -93.345), (-73.66, -102.235), (73.66, -102.235), align=None)
    extrude(amount=-BOSS_EXTRUDE13_DEPTH)

    # Sketch20 → Cut-Extrude6 (cut)
    with BuildSketch(Plane(origin=(0, -102.235, 0), x_dir=(1, 0, 0), z_dir=(0, 1, 0))):
        with Locations((38.1, -15.3162)):
            Rectangle(SKETCH20_W, SKETCH20_H)
    extrude(amount=CUT_EXTRUDE6_DEPTH, mode=Mode.SUBTRACT)

    # Sketch21 → Cut-Extrude7 (cut)
    with BuildSketch(Plane(origin=(0, -102.235, 0), x_dir=(1, 0, 0), z_dir=(0, 1, 0))):
        with Locations((38.1, -11.8237)):
            Rectangle(SKETCH21_W, SKETCH21_H)
    extrude(amount=-CUT_EXTRUDE7_DEPTH, mode=Mode.SUBTRACT)


solid = part.part
